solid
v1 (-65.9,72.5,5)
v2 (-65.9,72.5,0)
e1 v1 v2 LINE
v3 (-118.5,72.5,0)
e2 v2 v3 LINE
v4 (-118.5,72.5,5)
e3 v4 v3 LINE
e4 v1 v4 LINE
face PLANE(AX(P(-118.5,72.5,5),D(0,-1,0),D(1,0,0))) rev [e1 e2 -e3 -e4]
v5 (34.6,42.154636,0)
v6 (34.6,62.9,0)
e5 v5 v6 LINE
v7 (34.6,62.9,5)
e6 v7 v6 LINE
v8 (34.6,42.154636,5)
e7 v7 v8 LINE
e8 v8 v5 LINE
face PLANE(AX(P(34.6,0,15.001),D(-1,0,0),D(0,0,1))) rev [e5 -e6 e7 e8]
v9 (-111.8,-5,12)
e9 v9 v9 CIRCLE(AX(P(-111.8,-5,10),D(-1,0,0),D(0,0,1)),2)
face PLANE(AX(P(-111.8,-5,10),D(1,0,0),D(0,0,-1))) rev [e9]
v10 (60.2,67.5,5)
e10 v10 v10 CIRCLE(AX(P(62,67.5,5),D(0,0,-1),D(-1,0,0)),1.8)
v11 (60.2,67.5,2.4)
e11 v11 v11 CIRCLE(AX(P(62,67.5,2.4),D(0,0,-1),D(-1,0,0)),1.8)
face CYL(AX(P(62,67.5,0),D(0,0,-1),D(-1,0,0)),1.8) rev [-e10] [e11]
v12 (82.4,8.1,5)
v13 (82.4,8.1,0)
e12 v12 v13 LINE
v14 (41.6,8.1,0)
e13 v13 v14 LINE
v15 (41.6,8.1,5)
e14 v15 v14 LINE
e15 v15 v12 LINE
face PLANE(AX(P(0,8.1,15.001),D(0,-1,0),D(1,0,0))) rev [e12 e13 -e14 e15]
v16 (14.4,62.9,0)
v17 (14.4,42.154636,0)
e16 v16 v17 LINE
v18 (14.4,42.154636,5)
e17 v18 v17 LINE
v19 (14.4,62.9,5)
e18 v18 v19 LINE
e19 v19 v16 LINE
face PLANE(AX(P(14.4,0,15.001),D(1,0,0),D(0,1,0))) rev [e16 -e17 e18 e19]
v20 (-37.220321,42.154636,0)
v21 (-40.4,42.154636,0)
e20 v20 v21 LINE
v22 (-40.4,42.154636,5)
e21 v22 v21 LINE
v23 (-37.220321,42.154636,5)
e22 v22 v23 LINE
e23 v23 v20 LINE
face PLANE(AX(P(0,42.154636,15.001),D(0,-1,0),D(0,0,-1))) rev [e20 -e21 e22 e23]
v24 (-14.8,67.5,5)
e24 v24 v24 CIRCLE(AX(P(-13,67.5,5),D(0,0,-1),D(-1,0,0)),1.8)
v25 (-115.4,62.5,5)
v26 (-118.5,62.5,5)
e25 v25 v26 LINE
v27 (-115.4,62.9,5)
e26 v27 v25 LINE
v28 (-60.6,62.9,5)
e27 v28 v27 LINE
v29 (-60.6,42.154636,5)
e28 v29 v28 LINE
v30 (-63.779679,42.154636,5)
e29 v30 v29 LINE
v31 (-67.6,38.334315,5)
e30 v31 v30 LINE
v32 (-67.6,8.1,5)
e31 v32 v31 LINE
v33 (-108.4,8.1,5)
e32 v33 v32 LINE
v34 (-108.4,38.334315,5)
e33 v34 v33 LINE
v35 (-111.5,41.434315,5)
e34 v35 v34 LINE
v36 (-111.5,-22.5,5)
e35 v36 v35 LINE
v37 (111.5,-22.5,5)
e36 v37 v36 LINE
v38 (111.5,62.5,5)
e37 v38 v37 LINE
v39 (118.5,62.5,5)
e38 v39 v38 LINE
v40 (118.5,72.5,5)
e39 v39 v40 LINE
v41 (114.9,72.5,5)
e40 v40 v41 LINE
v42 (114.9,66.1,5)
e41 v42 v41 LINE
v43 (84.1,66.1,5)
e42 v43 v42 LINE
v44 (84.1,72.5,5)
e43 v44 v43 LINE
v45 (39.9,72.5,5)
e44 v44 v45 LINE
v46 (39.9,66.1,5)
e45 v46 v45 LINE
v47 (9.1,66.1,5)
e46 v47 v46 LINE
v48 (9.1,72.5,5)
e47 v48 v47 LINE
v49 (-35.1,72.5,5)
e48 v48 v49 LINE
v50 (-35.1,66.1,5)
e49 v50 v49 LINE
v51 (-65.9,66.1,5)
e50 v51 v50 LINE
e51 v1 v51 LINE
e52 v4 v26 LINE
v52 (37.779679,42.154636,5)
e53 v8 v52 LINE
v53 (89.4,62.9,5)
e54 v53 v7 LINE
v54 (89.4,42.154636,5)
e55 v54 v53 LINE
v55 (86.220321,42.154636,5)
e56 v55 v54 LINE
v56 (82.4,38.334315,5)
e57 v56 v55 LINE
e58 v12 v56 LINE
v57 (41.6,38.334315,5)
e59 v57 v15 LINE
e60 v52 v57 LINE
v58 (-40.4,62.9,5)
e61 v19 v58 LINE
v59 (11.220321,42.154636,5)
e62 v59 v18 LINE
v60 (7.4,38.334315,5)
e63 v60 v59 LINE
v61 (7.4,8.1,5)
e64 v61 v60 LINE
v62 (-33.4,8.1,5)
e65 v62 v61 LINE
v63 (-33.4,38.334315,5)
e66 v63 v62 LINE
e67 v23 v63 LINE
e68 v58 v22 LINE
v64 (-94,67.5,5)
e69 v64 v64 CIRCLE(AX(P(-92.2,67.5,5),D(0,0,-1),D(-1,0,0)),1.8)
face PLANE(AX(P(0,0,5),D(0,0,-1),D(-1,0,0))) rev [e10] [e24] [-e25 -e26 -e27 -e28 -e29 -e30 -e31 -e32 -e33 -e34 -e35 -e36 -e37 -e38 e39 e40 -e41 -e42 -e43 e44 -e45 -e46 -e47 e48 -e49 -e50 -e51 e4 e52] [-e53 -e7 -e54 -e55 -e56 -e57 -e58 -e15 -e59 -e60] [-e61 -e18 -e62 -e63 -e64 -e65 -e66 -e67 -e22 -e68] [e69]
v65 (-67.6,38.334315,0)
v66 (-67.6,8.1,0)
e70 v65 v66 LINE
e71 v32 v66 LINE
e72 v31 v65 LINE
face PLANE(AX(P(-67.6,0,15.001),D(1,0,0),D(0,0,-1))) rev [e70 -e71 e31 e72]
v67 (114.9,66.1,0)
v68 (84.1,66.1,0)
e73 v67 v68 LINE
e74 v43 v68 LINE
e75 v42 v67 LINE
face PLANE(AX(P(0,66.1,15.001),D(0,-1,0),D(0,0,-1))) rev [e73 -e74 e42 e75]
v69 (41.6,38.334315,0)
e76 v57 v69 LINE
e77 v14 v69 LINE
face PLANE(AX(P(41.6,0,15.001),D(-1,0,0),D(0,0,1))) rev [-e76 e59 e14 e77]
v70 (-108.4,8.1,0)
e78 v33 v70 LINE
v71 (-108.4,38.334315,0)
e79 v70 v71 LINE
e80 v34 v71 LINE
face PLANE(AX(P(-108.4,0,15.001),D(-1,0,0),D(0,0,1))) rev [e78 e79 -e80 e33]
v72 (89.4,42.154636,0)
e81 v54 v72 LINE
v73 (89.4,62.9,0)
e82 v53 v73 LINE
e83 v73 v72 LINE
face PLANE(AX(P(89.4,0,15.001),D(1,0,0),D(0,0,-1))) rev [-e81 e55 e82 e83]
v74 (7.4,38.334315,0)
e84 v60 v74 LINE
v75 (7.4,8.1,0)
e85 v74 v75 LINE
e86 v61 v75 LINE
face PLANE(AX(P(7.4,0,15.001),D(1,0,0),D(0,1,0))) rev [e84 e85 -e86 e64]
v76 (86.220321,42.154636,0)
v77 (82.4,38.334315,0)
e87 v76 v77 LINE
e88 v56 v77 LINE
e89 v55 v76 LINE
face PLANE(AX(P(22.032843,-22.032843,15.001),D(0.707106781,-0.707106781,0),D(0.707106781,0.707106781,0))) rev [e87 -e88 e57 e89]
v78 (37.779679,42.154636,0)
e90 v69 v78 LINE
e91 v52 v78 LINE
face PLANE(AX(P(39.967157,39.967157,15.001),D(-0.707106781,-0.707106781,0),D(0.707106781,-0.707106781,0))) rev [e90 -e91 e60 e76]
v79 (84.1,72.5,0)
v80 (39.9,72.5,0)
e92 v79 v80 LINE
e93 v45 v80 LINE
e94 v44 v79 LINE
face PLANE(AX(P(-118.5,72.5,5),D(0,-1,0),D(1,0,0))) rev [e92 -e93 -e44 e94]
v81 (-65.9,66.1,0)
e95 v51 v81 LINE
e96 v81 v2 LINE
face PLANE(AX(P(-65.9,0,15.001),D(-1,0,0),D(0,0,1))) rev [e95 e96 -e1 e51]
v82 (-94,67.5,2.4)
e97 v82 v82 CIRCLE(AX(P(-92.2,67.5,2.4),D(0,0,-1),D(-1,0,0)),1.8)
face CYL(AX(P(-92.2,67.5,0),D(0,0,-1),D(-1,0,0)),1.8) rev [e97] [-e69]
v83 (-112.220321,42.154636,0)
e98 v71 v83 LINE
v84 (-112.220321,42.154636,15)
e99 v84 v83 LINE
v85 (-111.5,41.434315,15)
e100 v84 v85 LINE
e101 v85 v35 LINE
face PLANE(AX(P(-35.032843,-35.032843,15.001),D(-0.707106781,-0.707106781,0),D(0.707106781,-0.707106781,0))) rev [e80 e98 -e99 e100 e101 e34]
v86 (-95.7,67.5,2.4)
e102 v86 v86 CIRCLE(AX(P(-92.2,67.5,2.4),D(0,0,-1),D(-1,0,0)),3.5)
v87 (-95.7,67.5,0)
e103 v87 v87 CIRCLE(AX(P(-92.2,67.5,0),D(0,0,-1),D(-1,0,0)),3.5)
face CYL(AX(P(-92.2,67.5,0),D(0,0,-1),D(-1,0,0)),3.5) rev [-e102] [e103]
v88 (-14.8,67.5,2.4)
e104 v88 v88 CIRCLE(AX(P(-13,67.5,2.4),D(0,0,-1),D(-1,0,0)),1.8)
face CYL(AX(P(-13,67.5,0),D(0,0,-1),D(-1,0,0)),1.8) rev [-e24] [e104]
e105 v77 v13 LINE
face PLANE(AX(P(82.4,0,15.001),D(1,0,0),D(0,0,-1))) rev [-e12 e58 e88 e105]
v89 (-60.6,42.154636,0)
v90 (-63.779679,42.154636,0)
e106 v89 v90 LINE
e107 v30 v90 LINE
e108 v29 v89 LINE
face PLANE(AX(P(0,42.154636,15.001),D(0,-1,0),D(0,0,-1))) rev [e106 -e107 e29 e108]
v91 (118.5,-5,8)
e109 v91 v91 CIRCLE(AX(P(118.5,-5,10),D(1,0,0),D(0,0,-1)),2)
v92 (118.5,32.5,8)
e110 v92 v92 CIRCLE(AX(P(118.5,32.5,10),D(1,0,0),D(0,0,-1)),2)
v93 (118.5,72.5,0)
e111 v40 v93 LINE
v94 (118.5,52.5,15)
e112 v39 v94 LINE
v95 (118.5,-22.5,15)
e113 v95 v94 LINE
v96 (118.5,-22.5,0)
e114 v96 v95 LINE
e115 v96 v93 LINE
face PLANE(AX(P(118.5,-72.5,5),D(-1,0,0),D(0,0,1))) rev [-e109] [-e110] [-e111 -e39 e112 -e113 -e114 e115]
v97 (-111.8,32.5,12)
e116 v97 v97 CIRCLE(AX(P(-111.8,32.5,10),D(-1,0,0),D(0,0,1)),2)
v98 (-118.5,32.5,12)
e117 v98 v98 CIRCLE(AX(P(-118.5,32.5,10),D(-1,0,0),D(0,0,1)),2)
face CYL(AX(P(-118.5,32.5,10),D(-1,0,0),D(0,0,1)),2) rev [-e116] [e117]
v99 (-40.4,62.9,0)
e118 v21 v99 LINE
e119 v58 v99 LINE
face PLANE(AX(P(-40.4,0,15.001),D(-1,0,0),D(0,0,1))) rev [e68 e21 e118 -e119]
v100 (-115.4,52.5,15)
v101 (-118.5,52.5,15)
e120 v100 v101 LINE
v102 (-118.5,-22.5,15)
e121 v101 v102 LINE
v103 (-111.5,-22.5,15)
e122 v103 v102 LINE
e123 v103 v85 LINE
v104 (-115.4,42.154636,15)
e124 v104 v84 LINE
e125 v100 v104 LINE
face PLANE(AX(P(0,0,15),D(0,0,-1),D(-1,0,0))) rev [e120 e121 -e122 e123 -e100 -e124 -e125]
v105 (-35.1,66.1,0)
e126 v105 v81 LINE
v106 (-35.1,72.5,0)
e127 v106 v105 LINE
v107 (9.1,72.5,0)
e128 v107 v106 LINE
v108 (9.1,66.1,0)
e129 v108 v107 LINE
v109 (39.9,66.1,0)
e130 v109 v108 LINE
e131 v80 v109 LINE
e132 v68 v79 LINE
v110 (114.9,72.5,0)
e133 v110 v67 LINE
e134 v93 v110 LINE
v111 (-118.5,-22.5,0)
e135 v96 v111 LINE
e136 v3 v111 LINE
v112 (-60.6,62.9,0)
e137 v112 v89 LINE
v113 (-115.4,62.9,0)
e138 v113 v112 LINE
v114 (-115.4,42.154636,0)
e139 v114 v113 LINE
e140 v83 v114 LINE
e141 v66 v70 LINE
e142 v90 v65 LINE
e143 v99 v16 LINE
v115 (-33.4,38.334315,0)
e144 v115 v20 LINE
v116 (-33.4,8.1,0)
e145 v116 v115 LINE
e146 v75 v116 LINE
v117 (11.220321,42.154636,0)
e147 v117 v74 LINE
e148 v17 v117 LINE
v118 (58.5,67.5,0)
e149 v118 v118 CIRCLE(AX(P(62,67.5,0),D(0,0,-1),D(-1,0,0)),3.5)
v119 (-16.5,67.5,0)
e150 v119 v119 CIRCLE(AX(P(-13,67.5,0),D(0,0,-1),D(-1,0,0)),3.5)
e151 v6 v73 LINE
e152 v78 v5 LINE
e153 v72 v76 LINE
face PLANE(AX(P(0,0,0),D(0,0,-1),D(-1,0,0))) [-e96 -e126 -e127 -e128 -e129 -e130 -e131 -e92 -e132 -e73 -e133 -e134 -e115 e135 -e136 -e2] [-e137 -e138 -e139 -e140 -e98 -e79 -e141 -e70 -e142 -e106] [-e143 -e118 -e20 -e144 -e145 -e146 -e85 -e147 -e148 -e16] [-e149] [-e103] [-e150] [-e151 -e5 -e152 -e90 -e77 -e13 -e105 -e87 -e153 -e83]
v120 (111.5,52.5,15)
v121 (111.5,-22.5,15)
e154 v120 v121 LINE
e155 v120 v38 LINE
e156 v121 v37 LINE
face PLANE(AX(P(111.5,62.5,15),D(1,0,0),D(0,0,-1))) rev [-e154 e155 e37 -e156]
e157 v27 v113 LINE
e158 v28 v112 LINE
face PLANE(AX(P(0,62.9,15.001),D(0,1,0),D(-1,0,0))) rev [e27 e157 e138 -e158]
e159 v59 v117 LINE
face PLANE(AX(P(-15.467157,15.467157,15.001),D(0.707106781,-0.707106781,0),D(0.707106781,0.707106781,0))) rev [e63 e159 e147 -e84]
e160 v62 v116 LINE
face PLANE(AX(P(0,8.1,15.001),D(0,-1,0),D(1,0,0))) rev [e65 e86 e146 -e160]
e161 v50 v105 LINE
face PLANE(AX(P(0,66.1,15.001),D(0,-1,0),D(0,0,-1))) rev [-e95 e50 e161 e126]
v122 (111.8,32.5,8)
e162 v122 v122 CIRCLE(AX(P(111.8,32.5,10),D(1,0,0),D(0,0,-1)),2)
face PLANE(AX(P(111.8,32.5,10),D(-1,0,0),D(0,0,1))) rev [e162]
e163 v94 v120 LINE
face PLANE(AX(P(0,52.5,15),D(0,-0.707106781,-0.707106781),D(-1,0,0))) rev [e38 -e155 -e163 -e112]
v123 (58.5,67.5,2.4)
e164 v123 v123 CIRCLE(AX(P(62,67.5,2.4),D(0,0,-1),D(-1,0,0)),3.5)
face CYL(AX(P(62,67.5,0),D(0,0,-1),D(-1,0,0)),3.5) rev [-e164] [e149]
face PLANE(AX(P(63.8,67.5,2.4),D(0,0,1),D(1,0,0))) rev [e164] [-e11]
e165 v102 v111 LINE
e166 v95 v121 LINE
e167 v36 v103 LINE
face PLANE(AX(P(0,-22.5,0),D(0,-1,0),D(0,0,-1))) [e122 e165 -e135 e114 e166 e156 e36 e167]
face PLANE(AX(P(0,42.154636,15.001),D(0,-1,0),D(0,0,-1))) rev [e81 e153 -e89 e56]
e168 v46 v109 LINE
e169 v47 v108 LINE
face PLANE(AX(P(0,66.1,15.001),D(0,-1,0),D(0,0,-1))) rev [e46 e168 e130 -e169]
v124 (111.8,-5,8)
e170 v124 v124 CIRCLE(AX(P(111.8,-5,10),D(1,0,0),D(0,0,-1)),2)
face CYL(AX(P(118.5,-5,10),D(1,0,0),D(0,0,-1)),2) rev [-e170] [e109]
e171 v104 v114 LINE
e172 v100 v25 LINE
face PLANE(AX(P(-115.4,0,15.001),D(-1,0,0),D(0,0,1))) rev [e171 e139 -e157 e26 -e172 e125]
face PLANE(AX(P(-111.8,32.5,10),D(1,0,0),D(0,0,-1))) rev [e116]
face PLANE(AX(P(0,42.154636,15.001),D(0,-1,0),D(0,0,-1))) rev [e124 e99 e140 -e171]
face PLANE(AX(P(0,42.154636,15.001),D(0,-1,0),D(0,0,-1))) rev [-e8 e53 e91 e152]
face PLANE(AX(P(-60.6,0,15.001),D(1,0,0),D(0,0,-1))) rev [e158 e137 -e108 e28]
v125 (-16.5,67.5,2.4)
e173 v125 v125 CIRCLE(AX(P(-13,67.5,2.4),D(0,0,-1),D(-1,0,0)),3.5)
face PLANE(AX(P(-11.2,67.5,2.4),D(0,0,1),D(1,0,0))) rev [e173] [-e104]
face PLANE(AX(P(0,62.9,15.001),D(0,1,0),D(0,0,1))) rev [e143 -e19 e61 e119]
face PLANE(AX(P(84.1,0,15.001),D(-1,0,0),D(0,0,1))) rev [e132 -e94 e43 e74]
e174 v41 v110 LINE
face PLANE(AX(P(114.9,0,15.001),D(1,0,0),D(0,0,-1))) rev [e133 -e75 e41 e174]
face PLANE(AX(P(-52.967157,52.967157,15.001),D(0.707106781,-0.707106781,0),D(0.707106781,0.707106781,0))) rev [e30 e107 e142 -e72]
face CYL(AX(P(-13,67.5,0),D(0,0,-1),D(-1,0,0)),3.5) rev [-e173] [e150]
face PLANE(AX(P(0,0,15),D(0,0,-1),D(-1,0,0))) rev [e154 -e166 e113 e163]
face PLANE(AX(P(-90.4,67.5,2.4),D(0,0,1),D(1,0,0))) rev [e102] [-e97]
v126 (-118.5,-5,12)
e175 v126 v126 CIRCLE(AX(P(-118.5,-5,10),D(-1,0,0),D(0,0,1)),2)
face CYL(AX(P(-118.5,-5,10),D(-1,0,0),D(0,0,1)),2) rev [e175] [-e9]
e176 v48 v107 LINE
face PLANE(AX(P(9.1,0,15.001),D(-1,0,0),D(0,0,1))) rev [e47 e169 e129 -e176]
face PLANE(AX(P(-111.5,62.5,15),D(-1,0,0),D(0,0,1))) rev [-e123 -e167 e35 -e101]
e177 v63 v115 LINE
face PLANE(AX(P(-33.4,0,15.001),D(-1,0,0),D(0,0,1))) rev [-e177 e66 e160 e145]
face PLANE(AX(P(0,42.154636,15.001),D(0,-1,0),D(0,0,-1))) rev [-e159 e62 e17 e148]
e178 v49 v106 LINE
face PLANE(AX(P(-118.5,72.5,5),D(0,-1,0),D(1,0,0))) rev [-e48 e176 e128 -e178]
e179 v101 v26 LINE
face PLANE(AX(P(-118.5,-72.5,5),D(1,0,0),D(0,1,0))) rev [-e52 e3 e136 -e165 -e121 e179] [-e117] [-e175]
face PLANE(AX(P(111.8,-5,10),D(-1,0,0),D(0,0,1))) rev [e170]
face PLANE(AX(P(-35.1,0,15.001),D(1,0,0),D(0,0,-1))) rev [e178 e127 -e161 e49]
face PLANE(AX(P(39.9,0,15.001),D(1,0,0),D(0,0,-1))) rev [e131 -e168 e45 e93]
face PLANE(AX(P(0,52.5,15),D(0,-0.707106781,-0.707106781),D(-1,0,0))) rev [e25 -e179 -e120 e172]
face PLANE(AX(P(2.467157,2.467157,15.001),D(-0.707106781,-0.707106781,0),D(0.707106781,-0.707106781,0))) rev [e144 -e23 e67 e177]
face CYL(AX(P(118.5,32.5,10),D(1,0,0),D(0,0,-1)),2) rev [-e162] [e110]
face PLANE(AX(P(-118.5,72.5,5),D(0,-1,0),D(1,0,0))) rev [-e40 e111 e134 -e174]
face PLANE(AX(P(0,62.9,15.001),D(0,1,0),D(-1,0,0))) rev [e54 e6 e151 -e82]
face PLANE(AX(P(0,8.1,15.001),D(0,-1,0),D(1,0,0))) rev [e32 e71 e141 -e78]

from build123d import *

# Parameters (mm, degrees)
SZKIC1_W                                  = 237
SZKIC1_H                                  = 145
DODANIE_WYCI_GNI_CIE1_DEPTH               = 5
SZKIC2_W                                  = 7
SZKIC2_H                                  = 135
DODANIE_WYCI_GNI_CIE2_DEPTH               = 10
OTW_R_4_0_4_1_D                           = 4
OTW_R_4_0_4_1_DEPTH                       = 6.7
SFAZOWANIE1_SIZE                          = 10
WYTNIJ_WYCI_GNI_CIE1_REACH                = 141.727
SZKIC5_W                                  = 30
SZKIC5_H                                  = 6
POG_BIENIE_WALCOWE_POD_M3_RUB_Z_B_2_COUNT = 2
POG_BIENIE_WALCOWE_POD_M3_RUB_Z_B_2_PITCH = 75
POG_BIENIE_WALCOWE_POD_M3_RUB_Z_B_3_COUNT = 2
POG_BIENIE_WALCOWE_POD_M3_RUB_Z_B_3_PITCH = 154.2


with BuildPart() as part:
    # Szkic1 → Dodanie-wyciągnięcie1 (new body)
    with BuildSketch(Plane.XY):
        Rectangle(SZKIC1_W, SZKIC1_H)
    extrude(amount=DODANIE_WYCI_GNI_CIE1_DEPTH)

    # Szkic2 → Dodanie-wyciągnięcie2 (add)
    with BuildSketch(Plane.XY.offset(5)):
        with Locations((115, -5)):
            Rectangle(SZKIC2_W, SZKIC2_H)
        with Locations((-115, -5)):
            Rectangle(SZKIC2_W, SZKIC2_H)
    extrude(amount=DODANIE_WYCI_GNI_CIE2_DEPTH)

    # Otwór Ø4.0 (4)1
    with Locations(Plane(origin=(118.5, 0, 0), x_dir=(0, 0, -1), z_dir=(1, 0, 0))):
        with Locations((-10, -42.5), (-10, 32.5), (-10, -5)):
            otw_r_4_0_4_1 = Hole(OTW_R_4_0_4_1_D / 2, depth=OTW_R_4_0_4_1_DEPTH)

    # Lustro1: Otwór Ø4.0 (4)1 across plane
    add(otw_r_4_0_4_1.mirror(Plane.ZY), mode=Mode.SUBTRACT)

    # Sfazowanie1
    sfazowanie1_edges = [part.edges().sort_by_distance(p)[0] for p in [
        (-115, 62.5, 15),
        (115, 62.5, 15),
    ]]
    chamfer(sfazowanie1_edges, length=SFAZOWANIE1_SIZE - 0.0001)  # a hair under: the kernel refuses the full size

    # Szkic5 → Wytnij-wyciągnięcie1 (cut, up to next)
    with BuildSketch(Plane(origin=(0, 0, 0), x_dir=(-1, 0, 0), z_dir=(0, 0, -1)), mode=Mode.PRIVATE) as wytnij_wyci_gni_cie1_sk1:
        with Locations((-99.5, 69.5)):
            Rectangle(SZKIC5_W, SZKIC5_H)
    wytnij_wyci_gni_cie1_tool1 = extrude(wytnij_wyci_gni_cie1_sk1.sketch, amount=-WYTNIJ_WYCI_GNI_CIE1_REACH, mode=Mode.PRIVATE) & part.part
    # Szkic5 → Wytnij-wyciągnięcie1 (cut, up to next)
    with BuildSketch(Plane(origin=(0, 0, 0), x_dir=(-1, 0, 0), z_dir=(0, 0, -1)), mode=Mode.PRIVATE) as wytnij_wyci_gni_cie1_sk2:
        Polygon((-84.1, 72.5), (-84.5, 72.5), (-84.5, 66.5), (-114.5, 66.5), (-114.5, 72.5), (-114.9, 72.5), (-114.9, 66.1), (-84.1, 66.1), align=None)
    wytnij_wyci_gni_cie1_tool2 = extrude(wytnij_wyci_gni_cie1_sk2.sketch, amount=-WYTNIJ_WYCI_GNI_CIE1_REACH, mode=Mode.PRIVATE) & part.part
    # Szkic5 → Wytnij-wyciągnięcie1 (cut, up to next)
    with BuildSketch(Plane(origin=(0, 0, 0), x_dir=(-1, 0, 0), z_dir=(0, 0, -1)), mode=Mode.PRIVATE) as wytnij_wyci_gni_cie1_sk3:
        Polygon((-89.4, 62.9), (-89.4, 42.154636006), (-86.220321431, 42.154636006), (-85.282842712, 41.217157288), (-82.4, 38.334314575), (-82.4, 8.1), (-41.6, 8.1), (-41.6, 38.334314575), (-38.717157288, 41.217157288), (-37.779678569, 42.154636006), (-34.6, 42.154636006), (-34.6, 62.9), align=None)
        Polygon((-42, 8.5), (-42, 38.5), (-39, 41.5), (-38, 42.5), (-38, 42.554636006), (-35, 42.554636006), (-35, 62.5), (-89, 62.5), (-89, 42.554636006), (-86, 42.554636006), (-86, 42.5), (-85, 41.5), (-82, 38.5), (-82, 8.5), align=None, mode=Mode.SUBTRACT)
    wytnij_wyci_gni_cie1_tool3 = extrude(wytnij_wyci_gni_cie1_sk3.sketch, amount=-WYTNIJ_WYCI_GNI_CIE1_REACH, mode=Mode.PRIVATE) & part.part
    # Szkic5 → Wytnij-wyciągnięcie1 (cut, up to next)
    with BuildSketch(Plane(origin=(0, 0, 0), x_dir=(-1, 0, 0), z_dir=(0, 0, -1)), mode=Mode.PRIVATE) as wytnij_wyci_gni_cie1_sk4:
        Polygon((-82, 8.5), (-42, 8.5), (-42, 38.5), (-39, 41.5), (-38, 42.5), (-38, 42.554636006), (-35, 42.554636006), (-35, 62.5), (-89, 62.5), (-89, 42.554636006), (-86, 42.554636006), (-86, 42.5), (-85, 41.5), (-82, 38.5), align=None)
    wytnij_wyci_gni_cie1_tool4 = extrude(wytnij_wyci_gni_cie1_sk4.sketch, amount=-WYTNIJ_WYCI_GNI_CIE1_REACH, mode=Mode.PRIVATE) & part.part
    # Szkic5 → Wytnij-wyciągnięcie1 (cut, up to next)
    with BuildSketch(Plane(origin=(0, 0, 0), x_dir=(-1, 0, 0), z_dir=(0, 0, -1)), mode=Mode.PRIVATE) as wytnij_wyci_gni_cie1_sk5:
        Polygon((-14.4, 62.9), (-14.4, 42.154636006), (-11.220321431, 42.154636006), (-10.282842712, 41.217157288), (-7.4, 38.334314575), (-7.4, 8.1), (33.4, 8.1), (33.4, 38.334314575), (36.282842712, 41.217157288), (37.220321431, 42.154636006), (40.4, 42.154636006), (40.4, 62.9), align=None)
        Polygon((33, 8.5), (33, 38.5), (36, 41.5), (37, 42.5), (37, 42.554636006), (40, 42.554636006), (40, 62.5), (-14, 62.5), (-14, 42.554636006), (-11, 42.554636006), (-11, 42.5), (-10, 41.5), (-7, 38.5), (-7, 8.5), align=None, mode=Mode.SUBTRACT)
    wytnij_wyci_gni_cie1_tool5 = extrude(wytnij_wyci_gni_cie1_sk5.sketch, amount=-WYTNIJ_WYCI_GNI_CIE1_REACH, mode=Mode.PRIVATE) & part.part
    # Szkic5 → Wytnij-wyciągnięcie1 (cut, up to next)
    with BuildSketch(Plane(origin=(0, 0, 0), x_dir=(-1, 0, 0), z_dir=(0, 0, -1)), mode=Mode.PRIVATE) as wytnij_wyci_gni_cie1_sk6:
        Polygon((-7, 8.5), (33, 8.5), (33, 38.5), (36, 41.5), (37, 42.5), (37, 42.554636006), (40, 42.554636006), (40, 62.5), (-14, 62.5), (-14, 42.554636006), (-11, 42.554636006), (-11, 42.5), (-10, 41.5), (-7, 38.5), align=None)
    wytnij_wyci_gni_cie1_tool6 = extrude(wytnij_wyci_gni_cie1_sk6.sketch, amount=-WYTNIJ_WYCI_GNI_CIE1_REACH, mode=Mode.PRIVATE) & part.part
    # Szkic5 → Wytnij-wyciągnięcie1 (cut, up to next)
    with BuildSketch(Plane(origin=(0, 0, 0), x_dir=(-1, 0, 0), z_dir=(0, 0, -1)), mode=Mode.PRIVATE) as wytnij_wyci_gni_cie1_sk7:
        with Locations((-24.5, 69.5)):
            Rectangle(SZKIC5_W, SZKIC5_H)
    wytnij_wyci_gni_cie1_tool7 = extrude(wytnij_wyci_gni_cie1_sk7.sketch, amount=-WYTNIJ_WYCI_GNI_CIE1_REACH, mode=Mode.PRIVATE) & part.part
    # Szkic5 → Wytnij-wyciągnięcie1 (cut, up to next)
    with BuildSketch(Plane(origin=(0, 0, 0), x_dir=(-1, 0, 0), z_dir=(0, 0, -1)), mode=Mode.PRIVATE) as wytnij_wyci_gni_cie1_sk8:
        Polygon((-39.5, 72.5), (-39.9, 72.5), (-39.9, 66.1), (-9.1, 66.1), (-9.1, 72.5), (-9.5, 72.5), (-9.5, 66.5), (-39.5, 66.5), align=None)
    wytnij_wyci_gni_cie1_tool8 = extrude(wytnij_wyci_gni_cie1_sk8.sketch, amount=-WYTNIJ_WYCI_GNI_CIE1_REACH, mode=Mode.PRIVATE) & part.part
    # Szkic5 → Wytnij-wyciągnięcie1 (cut, up to next)
    with BuildSketch(Plane(origin=(0, 0, 0), x_dir=(-1, 0, 0), z_dir=(0, 0, -1)), mode=Mode.PRIVATE) as wytnij_wyci_gni_cie1_sk9:
        Polygon((60.6, 62.9), (60.6, 42.154636006), (63.779678569, 42.154636006), (64.717157288, 41.217157288), (67.6, 38.334314575), (67.6, 8.1), (108.4, 8.1), (108.4, 38.334314575), (111.282842712, 41.217157288), (112.220321431, 42.154636006), (115.4, 42.154636006), (115.4, 62.9), align=None)
        Polygon((108, 8.5), (108, 38.5), (111, 41.5), (112, 42.5), (112, 42.554636006), (115, 42.554636006), (115, 62.5), (61, 62.5), (61, 42.554636006), (64, 42.554636006), (64, 42.5), (65, 41.5), (68, 38.5), (68, 8.5), align=None, mode=Mode.SUBTRACT)
    wytnij_wyci_gni_cie1_tool9 = extrude(wytnij_wyci_gni_cie1_sk9.sketch, amount=-WYTNIJ_WYCI_GNI_CIE1_REACH, mode=Mode.PRIVATE) & part.part
    # Szkic5 → Wytnij-wyciągnięcie1 (cut, up to next)
    with BuildSketch(Plane(origin=(0, 0, 0), x_dir=(-1, 0, 0), z_dir=(0, 0, -1)), mode=Mode.PRIVATE) as wytnij_wyci_gni_cie1_sk10:
        Polygon((68, 8.5), (108, 8.5), (108, 38.5), (111, 41.5), (112, 42.5), (112, 42.554636006), (115, 42.554636006), (115, 62.5), (61, 62.5), (61, 42.554636006), (64, 42.554636006), (64, 42.5), (65, 41.5), (68, 38.5), align=None)
    wytnij_wyci_gni_cie1_tool10 = extrude(wytnij_wyci_gni_cie1_sk10.sketch, amount=-WYTNIJ_WYCI_GNI_CIE1_REACH, mode=Mode.PRIVATE) & part.part
    # Szkic5 → Wytnij-wyciągnięcie1 (cut, up to next)
    with BuildSketch(Plane(origin=(0, 0, 0), x_dir=(-1, 0, 0), z_dir=(0, 0, -1)), mode=Mode.PRIVATE) as wytnij_wyci_gni_cie1_sk11:
        with Locations((50.5, 69.5)):
            Rectangle(SZKIC5_W, SZKIC5_H)
    wytnij_wyci_gni_cie1_tool11 = extrude(wytnij_wyci_gni_cie1_sk11.sketch, amount=-WYTNIJ_WYCI_GNI_CIE1_REACH, mode=Mode.PRIVATE) & part.part
    # Szkic5 → Wytnij-wyciągnięcie1 (cut, up to next)
    with BuildSketch(Plane(origin=(0, 0, 0), x_dir=(-1, 0, 0), z_dir=(0, 0, -1)), mode=Mode.PRIVATE) as wytnij_wyci_gni_cie1_sk12:
        Polygon((35.5, 72.5), (35.1, 72.5), (35.1, 66.1), (65.9, 66.1), (65.9, 72.5), (65.5, 72.5), (65.5, 66.5), (35.5, 66.5), align=None)
    wytnij_wyci_gni_cie1_tool12 = extrude(wytnij_wyci_gni_cie1_sk12.sketch, amount=-WYTNIJ_WYCI_GNI_CIE1_REACH, mode=Mode.PRIVATE) & part.part
    add(wytnij_wyci_gni_cie1_tool1.solids().sort_by_distance((99.5, 69.5, 0))[0], mode=Mode.SUBTRACT)
    add(wytnij_wyci_gni_cie1_tool2.solids().sort_by_distance((84.3, 72.185421, 0))[0], mode=Mode.SUBTRACT)
    add(wytnij_wyci_gni_cie1_tool3.solids().sort_by_distance((89.322501, 52.527318, 0))[0], mode=Mode.SUBTRACT)
    add(wytnij_wyci_gni_cie1_tool4.solids().sort_by_distance((62, 37.474353, 0))[0], mode=Mode.SUBTRACT)
    add(wytnij_wyci_gni_cie1_tool5.solids().sort_by_distance((14.322501, 52.527318, 0))[0], mode=Mode.SUBTRACT)
    add(wytnij_wyci_gni_cie1_tool6.solids().sort_by_distance((-13, 37.474353, 0))[0], mode=Mode.SUBTRACT)
    add(wytnij_wyci_gni_cie1_tool7.solids().sort_by_distance((24.5, 69.5, 0))[0], mode=Mode.SUBTRACT)
    add(wytnij_wyci_gni_cie1_tool8.solids().sort_by_distance((39.7, 72.185421, 0))[0], mode=Mode.SUBTRACT)
    add(wytnij_wyci_gni_cie1_tool9.solids().sort_by_distance((-60.677499, 52.527318, 0))[0], mode=Mode.SUBTRACT)
    add(wytnij_wyci_gni_cie1_tool10.solids().sort_by_distance((-88, 37.474353, 0))[0], mode=Mode.SUBTRACT)
    add(wytnij_wyci_gni_cie1_tool11.solids().sort_by_distance((-50.5, 69.5, 0))[0], mode=Mode.SUBTRACT)
    add(wytnij_wyci_gni_cie1_tool12.solids().sort_by_distance((-65.814579, 69.5, 0))[0], mode=Mode.SUBTRACT)


with BuildPart() as body_2:
    # Podziel1: the piece on the far side of the plane
    add(part.part)
    split(bisect_by=Plane(origin=(0, -22.5, 0), x_dir=(0, 0, -1), z_dir=(0, -1, 0)), keep=Keep.BOTTOM)

    # Szkic7 → Pogłębienie walcowe pod M3 Śrubę z łbem stożkowym ściętym1 (revolve, cut)
    with BuildSketch(Plane(origin=(62, 67.5, 0), x_dir=(0, 1, 0), z_dir=(1, 0, 0))):
        Polygon((0, 0), (0, 7.781549114), (1.8, 6.7), (1.8, 2.4), (3.5, 2.4), (3.5, 0), align=None)
    pog_bienie_walcowe_pod_m3_rub_z_bem_s = revolve(axis=Axis((62, 67.5, -6.35), (0, 0, 1)), mode=Mode.SUBTRACT)

    # Pog_bienie walcowe pod M3 _rub_ z _b 2: Pogłębienie walcowe pod M3 Śrubę z łbem stożkowym ściętym1 ×2
    with Locations(*[(-i * POG_BIENIE_WALCOWE_POD_M3_RUB_Z_B_2_PITCH, 0, 0) for i in range(1, POG_BIENIE_WALCOWE_POD_M3_RUB_Z_B_2_COUNT)]):
        add(pog_bienie_walcowe_pod_m3_rub_z_bem_s, mode=Mode.SUBTRACT)

    # Pog_bienie walcowe pod M3 _rub_ z _b 3: Pogłębienie walcowe pod M3 Śrubę z łbem stożkowym ściętym1 ×2
    with Locations(*[(-i * POG_BIENIE_WALCOWE_POD_M3_RUB_Z_B_3_PITCH, 0, 0) for i in range(1, POG_BIENIE_WALCOWE_POD_M3_RUB_Z_B_3_COUNT)]):
        add(pog_bienie_walcowe_pod_m3_rub_z_bem_s, mode=Mode.SUBTRACT)


with BuildPart() as part_1:
    add(part.part)

    # Podziel1
    split(bisect_by=Plane(origin=(0, -22.5, 0), x_dir=(0, 0, -1), z_dir=(0, -1, 0)), keep=Keep.TOP)


solid = body_2.part
